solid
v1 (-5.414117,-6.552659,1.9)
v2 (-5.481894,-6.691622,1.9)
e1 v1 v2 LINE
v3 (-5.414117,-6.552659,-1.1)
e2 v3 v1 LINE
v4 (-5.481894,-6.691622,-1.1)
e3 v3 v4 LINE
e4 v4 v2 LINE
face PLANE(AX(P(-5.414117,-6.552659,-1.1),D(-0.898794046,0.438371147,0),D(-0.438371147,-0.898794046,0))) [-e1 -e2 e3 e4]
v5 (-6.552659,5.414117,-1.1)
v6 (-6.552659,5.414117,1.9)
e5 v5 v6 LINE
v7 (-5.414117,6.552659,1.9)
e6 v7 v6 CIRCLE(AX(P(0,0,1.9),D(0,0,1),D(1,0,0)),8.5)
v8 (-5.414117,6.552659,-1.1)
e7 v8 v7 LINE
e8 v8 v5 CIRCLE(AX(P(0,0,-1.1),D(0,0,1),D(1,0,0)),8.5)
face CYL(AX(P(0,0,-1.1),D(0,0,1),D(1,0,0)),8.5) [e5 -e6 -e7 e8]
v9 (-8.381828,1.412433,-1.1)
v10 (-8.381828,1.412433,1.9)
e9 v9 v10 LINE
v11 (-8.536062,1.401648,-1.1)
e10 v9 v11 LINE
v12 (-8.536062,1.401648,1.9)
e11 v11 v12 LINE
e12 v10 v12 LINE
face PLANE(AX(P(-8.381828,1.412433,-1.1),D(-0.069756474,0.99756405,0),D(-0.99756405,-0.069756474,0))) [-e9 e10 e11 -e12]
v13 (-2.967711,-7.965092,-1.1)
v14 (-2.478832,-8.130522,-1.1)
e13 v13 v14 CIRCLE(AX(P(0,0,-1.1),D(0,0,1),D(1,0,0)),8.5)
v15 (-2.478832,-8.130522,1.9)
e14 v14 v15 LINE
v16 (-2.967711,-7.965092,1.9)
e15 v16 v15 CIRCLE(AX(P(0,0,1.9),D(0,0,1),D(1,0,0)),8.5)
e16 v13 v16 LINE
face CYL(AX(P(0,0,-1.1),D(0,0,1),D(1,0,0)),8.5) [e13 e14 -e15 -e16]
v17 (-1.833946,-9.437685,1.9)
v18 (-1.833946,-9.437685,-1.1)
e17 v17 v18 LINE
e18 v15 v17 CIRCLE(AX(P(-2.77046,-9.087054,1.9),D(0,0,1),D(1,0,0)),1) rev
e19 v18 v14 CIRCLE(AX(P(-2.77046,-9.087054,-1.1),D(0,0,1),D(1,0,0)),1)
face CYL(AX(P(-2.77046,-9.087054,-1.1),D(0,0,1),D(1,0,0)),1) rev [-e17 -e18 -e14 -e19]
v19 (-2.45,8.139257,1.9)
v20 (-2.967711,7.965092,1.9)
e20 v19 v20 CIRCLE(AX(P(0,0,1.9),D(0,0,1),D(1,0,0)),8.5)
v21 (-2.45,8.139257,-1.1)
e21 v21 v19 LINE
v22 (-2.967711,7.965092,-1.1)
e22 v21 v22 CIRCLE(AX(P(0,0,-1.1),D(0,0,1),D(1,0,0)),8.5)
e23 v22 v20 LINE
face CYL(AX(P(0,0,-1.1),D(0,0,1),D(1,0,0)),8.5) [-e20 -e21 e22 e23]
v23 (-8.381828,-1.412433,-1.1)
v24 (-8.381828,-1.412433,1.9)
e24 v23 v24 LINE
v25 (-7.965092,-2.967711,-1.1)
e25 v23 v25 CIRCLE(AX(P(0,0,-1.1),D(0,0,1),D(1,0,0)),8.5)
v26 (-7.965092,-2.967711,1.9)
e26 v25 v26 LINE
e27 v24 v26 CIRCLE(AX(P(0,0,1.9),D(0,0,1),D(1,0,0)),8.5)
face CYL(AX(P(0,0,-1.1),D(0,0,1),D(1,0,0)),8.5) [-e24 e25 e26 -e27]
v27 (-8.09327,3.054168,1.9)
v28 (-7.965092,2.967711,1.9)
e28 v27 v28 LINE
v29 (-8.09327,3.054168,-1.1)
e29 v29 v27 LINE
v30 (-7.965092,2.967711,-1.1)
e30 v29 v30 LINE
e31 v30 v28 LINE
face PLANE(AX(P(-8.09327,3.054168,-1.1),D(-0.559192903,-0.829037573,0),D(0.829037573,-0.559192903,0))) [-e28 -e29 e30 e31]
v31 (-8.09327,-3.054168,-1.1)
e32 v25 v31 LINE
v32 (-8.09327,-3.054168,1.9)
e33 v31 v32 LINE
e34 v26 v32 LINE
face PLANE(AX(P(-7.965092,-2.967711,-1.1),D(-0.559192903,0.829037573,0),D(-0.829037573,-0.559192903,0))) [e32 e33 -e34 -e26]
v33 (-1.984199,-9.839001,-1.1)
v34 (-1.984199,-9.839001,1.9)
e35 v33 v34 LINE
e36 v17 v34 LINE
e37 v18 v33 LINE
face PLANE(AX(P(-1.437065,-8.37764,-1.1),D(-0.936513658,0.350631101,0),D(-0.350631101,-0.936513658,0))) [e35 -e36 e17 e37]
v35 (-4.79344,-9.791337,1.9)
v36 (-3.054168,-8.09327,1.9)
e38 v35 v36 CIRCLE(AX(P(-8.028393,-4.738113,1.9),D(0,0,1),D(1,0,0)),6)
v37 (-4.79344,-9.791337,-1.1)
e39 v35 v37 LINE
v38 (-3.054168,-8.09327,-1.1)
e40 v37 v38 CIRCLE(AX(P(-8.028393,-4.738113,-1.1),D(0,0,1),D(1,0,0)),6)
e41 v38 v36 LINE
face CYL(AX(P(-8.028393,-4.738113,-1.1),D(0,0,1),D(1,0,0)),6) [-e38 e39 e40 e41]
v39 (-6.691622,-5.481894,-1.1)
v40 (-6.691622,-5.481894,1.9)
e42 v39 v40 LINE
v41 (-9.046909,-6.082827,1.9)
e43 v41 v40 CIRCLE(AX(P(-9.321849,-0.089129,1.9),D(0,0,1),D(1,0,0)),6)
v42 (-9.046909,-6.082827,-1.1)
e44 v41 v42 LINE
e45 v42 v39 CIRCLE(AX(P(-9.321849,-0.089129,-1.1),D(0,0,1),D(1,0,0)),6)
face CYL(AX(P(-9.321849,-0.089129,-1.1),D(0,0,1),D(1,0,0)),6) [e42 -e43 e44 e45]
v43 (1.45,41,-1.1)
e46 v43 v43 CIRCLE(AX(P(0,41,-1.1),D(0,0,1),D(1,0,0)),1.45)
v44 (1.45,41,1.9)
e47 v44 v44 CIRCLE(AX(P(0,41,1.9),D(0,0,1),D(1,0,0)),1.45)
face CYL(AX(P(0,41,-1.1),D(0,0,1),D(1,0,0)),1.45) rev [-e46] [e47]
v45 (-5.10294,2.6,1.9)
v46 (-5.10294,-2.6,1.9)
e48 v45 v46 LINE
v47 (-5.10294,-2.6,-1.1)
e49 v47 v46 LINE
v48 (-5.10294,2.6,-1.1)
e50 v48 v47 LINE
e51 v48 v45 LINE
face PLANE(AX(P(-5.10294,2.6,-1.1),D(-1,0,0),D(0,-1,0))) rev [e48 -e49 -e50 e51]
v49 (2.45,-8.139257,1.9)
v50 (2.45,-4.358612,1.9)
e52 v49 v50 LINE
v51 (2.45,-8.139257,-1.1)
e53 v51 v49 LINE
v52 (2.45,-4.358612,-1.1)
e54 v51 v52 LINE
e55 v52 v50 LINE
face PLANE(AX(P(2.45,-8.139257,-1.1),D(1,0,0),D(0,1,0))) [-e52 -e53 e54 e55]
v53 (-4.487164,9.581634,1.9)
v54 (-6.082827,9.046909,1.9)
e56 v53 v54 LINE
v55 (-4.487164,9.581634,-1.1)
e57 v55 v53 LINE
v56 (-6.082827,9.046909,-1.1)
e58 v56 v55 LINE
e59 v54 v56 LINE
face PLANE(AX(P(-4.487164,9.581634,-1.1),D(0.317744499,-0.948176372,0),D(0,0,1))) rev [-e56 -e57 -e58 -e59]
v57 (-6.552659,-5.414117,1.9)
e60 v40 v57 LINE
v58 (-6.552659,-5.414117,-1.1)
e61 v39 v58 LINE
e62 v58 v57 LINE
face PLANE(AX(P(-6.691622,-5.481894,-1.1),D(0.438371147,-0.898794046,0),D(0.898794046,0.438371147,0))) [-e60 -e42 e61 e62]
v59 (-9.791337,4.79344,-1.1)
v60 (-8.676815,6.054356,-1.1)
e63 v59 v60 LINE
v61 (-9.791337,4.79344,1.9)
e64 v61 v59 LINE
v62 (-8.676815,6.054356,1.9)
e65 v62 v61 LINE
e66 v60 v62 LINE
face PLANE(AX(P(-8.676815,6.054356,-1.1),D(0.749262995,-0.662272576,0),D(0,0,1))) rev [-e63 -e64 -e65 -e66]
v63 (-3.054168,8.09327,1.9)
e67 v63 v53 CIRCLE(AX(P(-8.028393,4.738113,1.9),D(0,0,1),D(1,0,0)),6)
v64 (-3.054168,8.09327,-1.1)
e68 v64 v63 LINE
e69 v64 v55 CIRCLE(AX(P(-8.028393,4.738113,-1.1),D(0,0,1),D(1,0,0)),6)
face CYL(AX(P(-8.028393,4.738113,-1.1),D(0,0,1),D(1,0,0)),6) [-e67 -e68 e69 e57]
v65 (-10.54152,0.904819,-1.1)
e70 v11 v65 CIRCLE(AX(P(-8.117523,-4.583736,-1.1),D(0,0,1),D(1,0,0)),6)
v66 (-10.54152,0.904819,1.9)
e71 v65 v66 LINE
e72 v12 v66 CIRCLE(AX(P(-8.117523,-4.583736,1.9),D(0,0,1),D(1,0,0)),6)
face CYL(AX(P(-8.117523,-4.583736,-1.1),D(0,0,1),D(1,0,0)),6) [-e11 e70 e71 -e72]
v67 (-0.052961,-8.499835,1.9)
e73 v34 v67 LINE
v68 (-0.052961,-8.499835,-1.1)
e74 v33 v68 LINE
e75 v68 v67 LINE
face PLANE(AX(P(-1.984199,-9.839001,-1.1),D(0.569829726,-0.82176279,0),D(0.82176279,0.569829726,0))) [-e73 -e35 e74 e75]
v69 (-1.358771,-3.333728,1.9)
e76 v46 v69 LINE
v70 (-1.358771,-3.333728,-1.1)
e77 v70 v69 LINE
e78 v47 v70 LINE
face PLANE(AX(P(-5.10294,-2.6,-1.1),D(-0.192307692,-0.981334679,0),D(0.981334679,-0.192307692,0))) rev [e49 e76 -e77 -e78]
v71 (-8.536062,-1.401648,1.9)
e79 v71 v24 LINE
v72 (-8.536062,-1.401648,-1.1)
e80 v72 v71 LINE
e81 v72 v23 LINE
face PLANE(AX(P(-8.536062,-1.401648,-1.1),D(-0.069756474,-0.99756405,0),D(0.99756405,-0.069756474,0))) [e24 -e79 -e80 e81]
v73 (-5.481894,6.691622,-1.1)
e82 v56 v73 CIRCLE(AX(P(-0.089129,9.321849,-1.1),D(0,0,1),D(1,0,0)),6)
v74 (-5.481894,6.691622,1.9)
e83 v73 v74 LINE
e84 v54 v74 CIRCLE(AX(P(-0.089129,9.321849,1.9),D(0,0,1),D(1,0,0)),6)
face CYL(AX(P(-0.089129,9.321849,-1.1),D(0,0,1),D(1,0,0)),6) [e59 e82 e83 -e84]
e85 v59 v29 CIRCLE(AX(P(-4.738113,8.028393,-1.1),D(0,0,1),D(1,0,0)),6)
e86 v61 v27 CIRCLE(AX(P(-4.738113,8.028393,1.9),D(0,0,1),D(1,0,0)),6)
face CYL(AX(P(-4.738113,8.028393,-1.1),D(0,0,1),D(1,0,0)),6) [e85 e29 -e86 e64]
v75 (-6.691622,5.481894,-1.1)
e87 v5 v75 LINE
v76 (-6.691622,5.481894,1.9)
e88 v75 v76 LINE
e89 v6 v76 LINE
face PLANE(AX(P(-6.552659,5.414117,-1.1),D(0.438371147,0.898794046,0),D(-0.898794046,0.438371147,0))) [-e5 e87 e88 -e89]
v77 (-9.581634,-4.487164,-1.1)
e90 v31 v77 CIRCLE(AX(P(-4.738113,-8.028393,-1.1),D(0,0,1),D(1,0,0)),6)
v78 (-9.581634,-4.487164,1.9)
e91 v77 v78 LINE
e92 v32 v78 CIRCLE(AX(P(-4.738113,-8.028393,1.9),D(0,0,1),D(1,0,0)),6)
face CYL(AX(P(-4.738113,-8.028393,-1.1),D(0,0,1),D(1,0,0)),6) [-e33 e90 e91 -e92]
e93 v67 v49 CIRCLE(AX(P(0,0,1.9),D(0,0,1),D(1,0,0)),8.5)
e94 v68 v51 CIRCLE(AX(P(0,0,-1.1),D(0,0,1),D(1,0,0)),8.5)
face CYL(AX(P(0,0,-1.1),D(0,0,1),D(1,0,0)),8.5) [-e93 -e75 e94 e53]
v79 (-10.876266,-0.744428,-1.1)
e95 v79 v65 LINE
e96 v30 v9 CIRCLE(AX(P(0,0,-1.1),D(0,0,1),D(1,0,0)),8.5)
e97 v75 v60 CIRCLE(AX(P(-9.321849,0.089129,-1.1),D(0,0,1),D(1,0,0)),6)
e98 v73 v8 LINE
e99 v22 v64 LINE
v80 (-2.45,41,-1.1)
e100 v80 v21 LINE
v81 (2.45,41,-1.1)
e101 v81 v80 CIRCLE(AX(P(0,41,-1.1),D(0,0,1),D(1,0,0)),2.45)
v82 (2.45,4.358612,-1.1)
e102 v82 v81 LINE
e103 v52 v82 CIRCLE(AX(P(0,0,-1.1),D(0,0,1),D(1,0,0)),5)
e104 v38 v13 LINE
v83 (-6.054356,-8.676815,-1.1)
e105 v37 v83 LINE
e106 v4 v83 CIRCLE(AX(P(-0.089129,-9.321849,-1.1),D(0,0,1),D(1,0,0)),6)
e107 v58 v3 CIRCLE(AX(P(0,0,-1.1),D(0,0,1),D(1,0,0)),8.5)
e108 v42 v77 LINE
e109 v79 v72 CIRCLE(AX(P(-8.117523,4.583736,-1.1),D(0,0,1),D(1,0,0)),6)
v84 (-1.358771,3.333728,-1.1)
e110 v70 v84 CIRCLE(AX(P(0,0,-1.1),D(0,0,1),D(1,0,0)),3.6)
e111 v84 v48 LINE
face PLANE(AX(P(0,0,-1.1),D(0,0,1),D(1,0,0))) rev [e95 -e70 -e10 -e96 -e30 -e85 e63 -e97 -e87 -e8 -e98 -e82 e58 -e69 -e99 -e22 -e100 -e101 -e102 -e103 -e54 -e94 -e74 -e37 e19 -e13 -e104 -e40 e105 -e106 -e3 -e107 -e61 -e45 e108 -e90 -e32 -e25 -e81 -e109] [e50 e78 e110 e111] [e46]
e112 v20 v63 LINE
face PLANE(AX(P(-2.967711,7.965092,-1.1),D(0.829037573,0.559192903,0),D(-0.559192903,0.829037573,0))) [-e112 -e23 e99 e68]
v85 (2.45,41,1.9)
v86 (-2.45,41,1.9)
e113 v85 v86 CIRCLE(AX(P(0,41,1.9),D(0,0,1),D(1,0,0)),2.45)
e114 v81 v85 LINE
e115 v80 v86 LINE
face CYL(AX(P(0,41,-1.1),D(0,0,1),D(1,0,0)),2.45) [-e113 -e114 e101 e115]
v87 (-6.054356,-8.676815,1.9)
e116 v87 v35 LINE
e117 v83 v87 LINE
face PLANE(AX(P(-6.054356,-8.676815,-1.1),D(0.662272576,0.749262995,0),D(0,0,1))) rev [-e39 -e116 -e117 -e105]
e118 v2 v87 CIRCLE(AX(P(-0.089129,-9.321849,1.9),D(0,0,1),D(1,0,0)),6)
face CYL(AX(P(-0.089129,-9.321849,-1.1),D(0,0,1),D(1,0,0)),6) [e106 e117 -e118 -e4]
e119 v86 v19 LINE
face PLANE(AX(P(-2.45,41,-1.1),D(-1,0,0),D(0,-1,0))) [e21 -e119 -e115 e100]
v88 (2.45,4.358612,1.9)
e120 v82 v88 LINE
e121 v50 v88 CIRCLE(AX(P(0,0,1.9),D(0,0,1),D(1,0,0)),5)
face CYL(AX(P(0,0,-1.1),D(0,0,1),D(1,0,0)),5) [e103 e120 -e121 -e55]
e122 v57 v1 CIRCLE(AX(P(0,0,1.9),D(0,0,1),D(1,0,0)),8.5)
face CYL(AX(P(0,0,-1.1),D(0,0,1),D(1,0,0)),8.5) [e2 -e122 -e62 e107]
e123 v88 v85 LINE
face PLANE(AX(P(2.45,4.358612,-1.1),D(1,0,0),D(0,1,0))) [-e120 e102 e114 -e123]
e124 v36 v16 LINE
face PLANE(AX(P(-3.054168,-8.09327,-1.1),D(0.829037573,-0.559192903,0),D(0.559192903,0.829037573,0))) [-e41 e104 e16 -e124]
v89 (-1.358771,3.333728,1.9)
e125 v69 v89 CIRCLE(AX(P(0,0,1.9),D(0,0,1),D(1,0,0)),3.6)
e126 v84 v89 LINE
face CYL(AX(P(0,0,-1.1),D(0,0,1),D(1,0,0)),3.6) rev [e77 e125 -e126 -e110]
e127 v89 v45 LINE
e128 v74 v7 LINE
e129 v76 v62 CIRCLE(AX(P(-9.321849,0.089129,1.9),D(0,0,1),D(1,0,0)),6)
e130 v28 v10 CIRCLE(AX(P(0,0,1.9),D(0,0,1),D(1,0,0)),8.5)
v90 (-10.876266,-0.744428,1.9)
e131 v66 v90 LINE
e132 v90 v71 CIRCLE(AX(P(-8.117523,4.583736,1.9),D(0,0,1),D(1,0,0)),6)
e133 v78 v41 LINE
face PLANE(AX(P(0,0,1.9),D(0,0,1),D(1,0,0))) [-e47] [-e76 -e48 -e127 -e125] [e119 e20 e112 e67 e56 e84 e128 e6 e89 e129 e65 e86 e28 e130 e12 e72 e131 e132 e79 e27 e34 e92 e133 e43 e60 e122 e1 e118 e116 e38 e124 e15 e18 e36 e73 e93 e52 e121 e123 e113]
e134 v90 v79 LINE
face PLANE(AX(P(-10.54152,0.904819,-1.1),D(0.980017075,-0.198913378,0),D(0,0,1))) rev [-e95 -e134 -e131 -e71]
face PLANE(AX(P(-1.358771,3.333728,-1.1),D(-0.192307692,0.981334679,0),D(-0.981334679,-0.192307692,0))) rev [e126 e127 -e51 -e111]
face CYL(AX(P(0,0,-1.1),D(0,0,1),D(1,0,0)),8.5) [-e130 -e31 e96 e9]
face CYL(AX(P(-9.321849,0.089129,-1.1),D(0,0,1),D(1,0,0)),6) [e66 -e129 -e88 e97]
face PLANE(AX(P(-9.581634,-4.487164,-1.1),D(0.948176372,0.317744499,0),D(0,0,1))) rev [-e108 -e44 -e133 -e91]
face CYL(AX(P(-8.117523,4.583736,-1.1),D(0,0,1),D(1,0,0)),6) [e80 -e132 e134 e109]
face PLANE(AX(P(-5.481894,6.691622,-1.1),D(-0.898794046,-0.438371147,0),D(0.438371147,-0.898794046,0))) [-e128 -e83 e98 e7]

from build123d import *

# Parameters (mm, degrees)
SKETCH1_R           = 1.45
BOSS_EXTRUDE1_DEPTH = 3
CUT_EXTRUDE2_DEPTH  = 46.173463436
SKETCH5_W           = 3.6
SKETCH5_H           = 3
FILLET1_R           = 1


with BuildPart() as part:
    # Sketch1 → Boss-Extrude1 (new body)
    with BuildSketch(Plane.XY.offset(1.9)):
        with BuildLine():
            Line((2.45, -8.139256723), (2.45, -4.358612164))
            ThreePointArc((2.45, -4.358612164), (5, 0), (2.45, 4.358612164))
            Line((2.45, 4.358612164), (2.45, 41))
            ThreePointArc((2.45, 41), (0, 43.45), (-2.45, 41))
            Line((-2.45, 41), (-2.45, 8.139256723))
            ThreePointArc((-2.45, 8.139256723), (-2.710254715, 8.056334116), (-2.967710696, 7.965092167))
            Line((-2.967710696, 7.965092167), (-3.054167872, 8.093270203))
            ThreePointArc((-3.054167872, 8.093270203), (-4.342095244, 9.472160372), (-5.994566265, 10.382893341))
            ThreePointArc((-5.994566265, 10.382893341), (-6.032083889, 8.496444973), (-5.481893659, 6.691622066))
            Line((-5.481893659, 6.691622066), (-5.414116812, 6.552658937))
            ThreePointArc((-5.414116812, 6.552658937), (-6.01040764, 6.01040764), (-6.552658937, 5.414116812))
            Line((-6.552658937, 5.414116812), (-6.691622066, 5.481893659))
            ThreePointArc((-6.691622066, 5.481893659), (-8.496444973, 6.032083889), (-10.382893341, 5.994566265))
            ThreePointArc((-10.382893341, 5.994566265), (-9.472160372, 4.342095244), (-8.093270203, 3.054167872))
            Line((-8.093270203, 3.054167872), (-7.965092167, 2.967710696))
            ThreePointArc((-7.965092167, 2.967710696), (-8.210369523, 2.199961883), (-8.381827508, 1.41243323))
            Line((-8.381827508, 1.41243323), (-8.536061531, 1.401648136))
            ThreePointArc((-8.536061531, 1.401648136), (-10.374179133, 0.975715399), (-11.989132531, 0))
            ThreePointArc((-11.989132531, 0), (-10.374179133, -0.975715399), (-8.536061531, -1.401648136))
            Line((-8.536061531, -1.401648136), (-8.381827508, -1.41243323))
            ThreePointArc((-8.381827508, -1.41243323), (-8.210369523, -2.199961883), (-7.965092167, -2.967710696))
            Line((-7.965092167, -2.967710696), (-8.093270203, -3.054167872))
            ThreePointArc((-8.093270203, -3.054167872), (-9.472160372, -4.342095244), (-10.382893341, -5.994566265))
            ThreePointArc((-10.382893341, -5.994566265), (-8.496444973, -6.032083889), (-6.691622066, -5.481893659))
            Line((-6.691622066, -5.481893659), (-6.552658937, -5.414116812))
            ThreePointArc((-6.552658937, -5.414116812), (-6.01040764, -6.01040764), (-5.414116812, -6.552658937))
            Line((-5.414116812, -6.552658937), (-5.481893659, -6.691622066))
            ThreePointArc((-5.481893659, -6.691622066), (-6.032083889, -8.496444973), (-5.994566265, -10.382893341))
            ThreePointArc((-5.994566265, -10.382893341), (-4.342095244, -9.472160372), (-3.054167872, -8.093270203))
            Line((-3.054167872, -8.093270203), (-2.967710696, -7.965092167))
            ThreePointArc((-2.967710696, -7.965092167), (-2.212026244, -8.207127384), (-1.437064557, -8.377639611))
            Line((-1.437064557, -8.377639611), (-1.984198903, -9.839001099))
            Line((-1.984198903, -9.839001099), (-0.052960828, -8.499835007))
            ThreePointArc((-0.052960828, -8.499835007), (1.212003867, -8.413147249), (2.45, -8.139256723))
        make_face()
        with Locations((0, 41)):
            Circle(SKETCH1_R, mode=Mode.SUBTRACT)
    extrude(amount=-BOSS_EXTRUDE1_DEPTH)

    # Sketch4 → Cut-Extrude2 (cut, through all)
    with BuildSketch(Plane.XY.offset(1.9)):
        with BuildLine():
            Line((-5.102940329, -2.6), (-1.358771093, -3.333727811))
            ThreePointArc((-1.358771093, -3.333727811), (-3.6, 0), (-1.358771093, 3.333727811))
            Line((-1.358771093, 3.333727811), (-5.102940329, 2.6))
            Line((-5.102940329, 2.6), (-5.102940329, -2.6))
        make_face()
    extrude(amount=-CUT_EXTRUDE2_DEPTH, mode=Mode.SUBTRACT)

    # Sketch5 → Cut-Revolve1 (revolve, cut)
    with BuildSketch(Plane(origin=(0, 0, 0), x_dir=(1, 0, 0), z_dir=(0, 1, 0))):
        with Locations((1.8, -0.4)):
            Rectangle(SKETCH5_W, SKETCH5_H)
    revolve(axis=Axis((0, 0, -1.1), (0, 0, 1)), mode=Mode.SUBTRACT)

    # Chamfer1
    # the kernel refuses this chamfer: 1.996823512, 1.412365401 mm, written as the material it takes off along each edge
    with BuildSketch(Plane(origin=(-5.994566265, -10.382893341, 6.307600342), x_dir=(0.8971018613244867, 0.44182377754953556, 0), z_dir=(0, 0, -1)), Plane(origin=(-10.382893341, -5.994566265, 6.307600342), x_dir=(0.9978248904640776, -0.06592031530834441, 0), z_dir=(0, 0, -1)), Plane(origin=(-11.989132531, 0, 6.307600342), x_dir=(0.8311815460161395, -0.5560011129145519, 0), z_dir=(0, 0, -1)), Plane(origin=(-10.382893341, 5.994566265, 6.307600342), x_dir=(0.4418237775496057, -0.8971018613244522, 0), z_dir=(0, 0, -1)), Plane(origin=(-5.994566265, 10.382893341, 6.307600342), x_dir=(-0.06592031530837167, -0.9978248904640757, 0), z_dir=(0, 0, -1))) as chamfer1_piece_1:
        with BuildLine():
            Line((1.33889649, 0), (0.700148491, -1.556942978))
            ThreePointArc((0.700148491, -1.556942978), (0.305807457, -0.828670891), (0, 0))
            ThreePointArc((0, 0), (0.684607685, 0.037444556), (1.33889649, 0))
        make_face()
    extrude(amount=11.815200684, mode=Mode.SUBTRACT)

    # Fillet1
    fillet1_edges = [part.edges().sort_by_distance(p)[0] for p in [
        (-1.437064557, -8.377639611, 0.4),
    ]]
    fillet(fillet1_edges, radius=FILLET1_R)


solid = part.part
